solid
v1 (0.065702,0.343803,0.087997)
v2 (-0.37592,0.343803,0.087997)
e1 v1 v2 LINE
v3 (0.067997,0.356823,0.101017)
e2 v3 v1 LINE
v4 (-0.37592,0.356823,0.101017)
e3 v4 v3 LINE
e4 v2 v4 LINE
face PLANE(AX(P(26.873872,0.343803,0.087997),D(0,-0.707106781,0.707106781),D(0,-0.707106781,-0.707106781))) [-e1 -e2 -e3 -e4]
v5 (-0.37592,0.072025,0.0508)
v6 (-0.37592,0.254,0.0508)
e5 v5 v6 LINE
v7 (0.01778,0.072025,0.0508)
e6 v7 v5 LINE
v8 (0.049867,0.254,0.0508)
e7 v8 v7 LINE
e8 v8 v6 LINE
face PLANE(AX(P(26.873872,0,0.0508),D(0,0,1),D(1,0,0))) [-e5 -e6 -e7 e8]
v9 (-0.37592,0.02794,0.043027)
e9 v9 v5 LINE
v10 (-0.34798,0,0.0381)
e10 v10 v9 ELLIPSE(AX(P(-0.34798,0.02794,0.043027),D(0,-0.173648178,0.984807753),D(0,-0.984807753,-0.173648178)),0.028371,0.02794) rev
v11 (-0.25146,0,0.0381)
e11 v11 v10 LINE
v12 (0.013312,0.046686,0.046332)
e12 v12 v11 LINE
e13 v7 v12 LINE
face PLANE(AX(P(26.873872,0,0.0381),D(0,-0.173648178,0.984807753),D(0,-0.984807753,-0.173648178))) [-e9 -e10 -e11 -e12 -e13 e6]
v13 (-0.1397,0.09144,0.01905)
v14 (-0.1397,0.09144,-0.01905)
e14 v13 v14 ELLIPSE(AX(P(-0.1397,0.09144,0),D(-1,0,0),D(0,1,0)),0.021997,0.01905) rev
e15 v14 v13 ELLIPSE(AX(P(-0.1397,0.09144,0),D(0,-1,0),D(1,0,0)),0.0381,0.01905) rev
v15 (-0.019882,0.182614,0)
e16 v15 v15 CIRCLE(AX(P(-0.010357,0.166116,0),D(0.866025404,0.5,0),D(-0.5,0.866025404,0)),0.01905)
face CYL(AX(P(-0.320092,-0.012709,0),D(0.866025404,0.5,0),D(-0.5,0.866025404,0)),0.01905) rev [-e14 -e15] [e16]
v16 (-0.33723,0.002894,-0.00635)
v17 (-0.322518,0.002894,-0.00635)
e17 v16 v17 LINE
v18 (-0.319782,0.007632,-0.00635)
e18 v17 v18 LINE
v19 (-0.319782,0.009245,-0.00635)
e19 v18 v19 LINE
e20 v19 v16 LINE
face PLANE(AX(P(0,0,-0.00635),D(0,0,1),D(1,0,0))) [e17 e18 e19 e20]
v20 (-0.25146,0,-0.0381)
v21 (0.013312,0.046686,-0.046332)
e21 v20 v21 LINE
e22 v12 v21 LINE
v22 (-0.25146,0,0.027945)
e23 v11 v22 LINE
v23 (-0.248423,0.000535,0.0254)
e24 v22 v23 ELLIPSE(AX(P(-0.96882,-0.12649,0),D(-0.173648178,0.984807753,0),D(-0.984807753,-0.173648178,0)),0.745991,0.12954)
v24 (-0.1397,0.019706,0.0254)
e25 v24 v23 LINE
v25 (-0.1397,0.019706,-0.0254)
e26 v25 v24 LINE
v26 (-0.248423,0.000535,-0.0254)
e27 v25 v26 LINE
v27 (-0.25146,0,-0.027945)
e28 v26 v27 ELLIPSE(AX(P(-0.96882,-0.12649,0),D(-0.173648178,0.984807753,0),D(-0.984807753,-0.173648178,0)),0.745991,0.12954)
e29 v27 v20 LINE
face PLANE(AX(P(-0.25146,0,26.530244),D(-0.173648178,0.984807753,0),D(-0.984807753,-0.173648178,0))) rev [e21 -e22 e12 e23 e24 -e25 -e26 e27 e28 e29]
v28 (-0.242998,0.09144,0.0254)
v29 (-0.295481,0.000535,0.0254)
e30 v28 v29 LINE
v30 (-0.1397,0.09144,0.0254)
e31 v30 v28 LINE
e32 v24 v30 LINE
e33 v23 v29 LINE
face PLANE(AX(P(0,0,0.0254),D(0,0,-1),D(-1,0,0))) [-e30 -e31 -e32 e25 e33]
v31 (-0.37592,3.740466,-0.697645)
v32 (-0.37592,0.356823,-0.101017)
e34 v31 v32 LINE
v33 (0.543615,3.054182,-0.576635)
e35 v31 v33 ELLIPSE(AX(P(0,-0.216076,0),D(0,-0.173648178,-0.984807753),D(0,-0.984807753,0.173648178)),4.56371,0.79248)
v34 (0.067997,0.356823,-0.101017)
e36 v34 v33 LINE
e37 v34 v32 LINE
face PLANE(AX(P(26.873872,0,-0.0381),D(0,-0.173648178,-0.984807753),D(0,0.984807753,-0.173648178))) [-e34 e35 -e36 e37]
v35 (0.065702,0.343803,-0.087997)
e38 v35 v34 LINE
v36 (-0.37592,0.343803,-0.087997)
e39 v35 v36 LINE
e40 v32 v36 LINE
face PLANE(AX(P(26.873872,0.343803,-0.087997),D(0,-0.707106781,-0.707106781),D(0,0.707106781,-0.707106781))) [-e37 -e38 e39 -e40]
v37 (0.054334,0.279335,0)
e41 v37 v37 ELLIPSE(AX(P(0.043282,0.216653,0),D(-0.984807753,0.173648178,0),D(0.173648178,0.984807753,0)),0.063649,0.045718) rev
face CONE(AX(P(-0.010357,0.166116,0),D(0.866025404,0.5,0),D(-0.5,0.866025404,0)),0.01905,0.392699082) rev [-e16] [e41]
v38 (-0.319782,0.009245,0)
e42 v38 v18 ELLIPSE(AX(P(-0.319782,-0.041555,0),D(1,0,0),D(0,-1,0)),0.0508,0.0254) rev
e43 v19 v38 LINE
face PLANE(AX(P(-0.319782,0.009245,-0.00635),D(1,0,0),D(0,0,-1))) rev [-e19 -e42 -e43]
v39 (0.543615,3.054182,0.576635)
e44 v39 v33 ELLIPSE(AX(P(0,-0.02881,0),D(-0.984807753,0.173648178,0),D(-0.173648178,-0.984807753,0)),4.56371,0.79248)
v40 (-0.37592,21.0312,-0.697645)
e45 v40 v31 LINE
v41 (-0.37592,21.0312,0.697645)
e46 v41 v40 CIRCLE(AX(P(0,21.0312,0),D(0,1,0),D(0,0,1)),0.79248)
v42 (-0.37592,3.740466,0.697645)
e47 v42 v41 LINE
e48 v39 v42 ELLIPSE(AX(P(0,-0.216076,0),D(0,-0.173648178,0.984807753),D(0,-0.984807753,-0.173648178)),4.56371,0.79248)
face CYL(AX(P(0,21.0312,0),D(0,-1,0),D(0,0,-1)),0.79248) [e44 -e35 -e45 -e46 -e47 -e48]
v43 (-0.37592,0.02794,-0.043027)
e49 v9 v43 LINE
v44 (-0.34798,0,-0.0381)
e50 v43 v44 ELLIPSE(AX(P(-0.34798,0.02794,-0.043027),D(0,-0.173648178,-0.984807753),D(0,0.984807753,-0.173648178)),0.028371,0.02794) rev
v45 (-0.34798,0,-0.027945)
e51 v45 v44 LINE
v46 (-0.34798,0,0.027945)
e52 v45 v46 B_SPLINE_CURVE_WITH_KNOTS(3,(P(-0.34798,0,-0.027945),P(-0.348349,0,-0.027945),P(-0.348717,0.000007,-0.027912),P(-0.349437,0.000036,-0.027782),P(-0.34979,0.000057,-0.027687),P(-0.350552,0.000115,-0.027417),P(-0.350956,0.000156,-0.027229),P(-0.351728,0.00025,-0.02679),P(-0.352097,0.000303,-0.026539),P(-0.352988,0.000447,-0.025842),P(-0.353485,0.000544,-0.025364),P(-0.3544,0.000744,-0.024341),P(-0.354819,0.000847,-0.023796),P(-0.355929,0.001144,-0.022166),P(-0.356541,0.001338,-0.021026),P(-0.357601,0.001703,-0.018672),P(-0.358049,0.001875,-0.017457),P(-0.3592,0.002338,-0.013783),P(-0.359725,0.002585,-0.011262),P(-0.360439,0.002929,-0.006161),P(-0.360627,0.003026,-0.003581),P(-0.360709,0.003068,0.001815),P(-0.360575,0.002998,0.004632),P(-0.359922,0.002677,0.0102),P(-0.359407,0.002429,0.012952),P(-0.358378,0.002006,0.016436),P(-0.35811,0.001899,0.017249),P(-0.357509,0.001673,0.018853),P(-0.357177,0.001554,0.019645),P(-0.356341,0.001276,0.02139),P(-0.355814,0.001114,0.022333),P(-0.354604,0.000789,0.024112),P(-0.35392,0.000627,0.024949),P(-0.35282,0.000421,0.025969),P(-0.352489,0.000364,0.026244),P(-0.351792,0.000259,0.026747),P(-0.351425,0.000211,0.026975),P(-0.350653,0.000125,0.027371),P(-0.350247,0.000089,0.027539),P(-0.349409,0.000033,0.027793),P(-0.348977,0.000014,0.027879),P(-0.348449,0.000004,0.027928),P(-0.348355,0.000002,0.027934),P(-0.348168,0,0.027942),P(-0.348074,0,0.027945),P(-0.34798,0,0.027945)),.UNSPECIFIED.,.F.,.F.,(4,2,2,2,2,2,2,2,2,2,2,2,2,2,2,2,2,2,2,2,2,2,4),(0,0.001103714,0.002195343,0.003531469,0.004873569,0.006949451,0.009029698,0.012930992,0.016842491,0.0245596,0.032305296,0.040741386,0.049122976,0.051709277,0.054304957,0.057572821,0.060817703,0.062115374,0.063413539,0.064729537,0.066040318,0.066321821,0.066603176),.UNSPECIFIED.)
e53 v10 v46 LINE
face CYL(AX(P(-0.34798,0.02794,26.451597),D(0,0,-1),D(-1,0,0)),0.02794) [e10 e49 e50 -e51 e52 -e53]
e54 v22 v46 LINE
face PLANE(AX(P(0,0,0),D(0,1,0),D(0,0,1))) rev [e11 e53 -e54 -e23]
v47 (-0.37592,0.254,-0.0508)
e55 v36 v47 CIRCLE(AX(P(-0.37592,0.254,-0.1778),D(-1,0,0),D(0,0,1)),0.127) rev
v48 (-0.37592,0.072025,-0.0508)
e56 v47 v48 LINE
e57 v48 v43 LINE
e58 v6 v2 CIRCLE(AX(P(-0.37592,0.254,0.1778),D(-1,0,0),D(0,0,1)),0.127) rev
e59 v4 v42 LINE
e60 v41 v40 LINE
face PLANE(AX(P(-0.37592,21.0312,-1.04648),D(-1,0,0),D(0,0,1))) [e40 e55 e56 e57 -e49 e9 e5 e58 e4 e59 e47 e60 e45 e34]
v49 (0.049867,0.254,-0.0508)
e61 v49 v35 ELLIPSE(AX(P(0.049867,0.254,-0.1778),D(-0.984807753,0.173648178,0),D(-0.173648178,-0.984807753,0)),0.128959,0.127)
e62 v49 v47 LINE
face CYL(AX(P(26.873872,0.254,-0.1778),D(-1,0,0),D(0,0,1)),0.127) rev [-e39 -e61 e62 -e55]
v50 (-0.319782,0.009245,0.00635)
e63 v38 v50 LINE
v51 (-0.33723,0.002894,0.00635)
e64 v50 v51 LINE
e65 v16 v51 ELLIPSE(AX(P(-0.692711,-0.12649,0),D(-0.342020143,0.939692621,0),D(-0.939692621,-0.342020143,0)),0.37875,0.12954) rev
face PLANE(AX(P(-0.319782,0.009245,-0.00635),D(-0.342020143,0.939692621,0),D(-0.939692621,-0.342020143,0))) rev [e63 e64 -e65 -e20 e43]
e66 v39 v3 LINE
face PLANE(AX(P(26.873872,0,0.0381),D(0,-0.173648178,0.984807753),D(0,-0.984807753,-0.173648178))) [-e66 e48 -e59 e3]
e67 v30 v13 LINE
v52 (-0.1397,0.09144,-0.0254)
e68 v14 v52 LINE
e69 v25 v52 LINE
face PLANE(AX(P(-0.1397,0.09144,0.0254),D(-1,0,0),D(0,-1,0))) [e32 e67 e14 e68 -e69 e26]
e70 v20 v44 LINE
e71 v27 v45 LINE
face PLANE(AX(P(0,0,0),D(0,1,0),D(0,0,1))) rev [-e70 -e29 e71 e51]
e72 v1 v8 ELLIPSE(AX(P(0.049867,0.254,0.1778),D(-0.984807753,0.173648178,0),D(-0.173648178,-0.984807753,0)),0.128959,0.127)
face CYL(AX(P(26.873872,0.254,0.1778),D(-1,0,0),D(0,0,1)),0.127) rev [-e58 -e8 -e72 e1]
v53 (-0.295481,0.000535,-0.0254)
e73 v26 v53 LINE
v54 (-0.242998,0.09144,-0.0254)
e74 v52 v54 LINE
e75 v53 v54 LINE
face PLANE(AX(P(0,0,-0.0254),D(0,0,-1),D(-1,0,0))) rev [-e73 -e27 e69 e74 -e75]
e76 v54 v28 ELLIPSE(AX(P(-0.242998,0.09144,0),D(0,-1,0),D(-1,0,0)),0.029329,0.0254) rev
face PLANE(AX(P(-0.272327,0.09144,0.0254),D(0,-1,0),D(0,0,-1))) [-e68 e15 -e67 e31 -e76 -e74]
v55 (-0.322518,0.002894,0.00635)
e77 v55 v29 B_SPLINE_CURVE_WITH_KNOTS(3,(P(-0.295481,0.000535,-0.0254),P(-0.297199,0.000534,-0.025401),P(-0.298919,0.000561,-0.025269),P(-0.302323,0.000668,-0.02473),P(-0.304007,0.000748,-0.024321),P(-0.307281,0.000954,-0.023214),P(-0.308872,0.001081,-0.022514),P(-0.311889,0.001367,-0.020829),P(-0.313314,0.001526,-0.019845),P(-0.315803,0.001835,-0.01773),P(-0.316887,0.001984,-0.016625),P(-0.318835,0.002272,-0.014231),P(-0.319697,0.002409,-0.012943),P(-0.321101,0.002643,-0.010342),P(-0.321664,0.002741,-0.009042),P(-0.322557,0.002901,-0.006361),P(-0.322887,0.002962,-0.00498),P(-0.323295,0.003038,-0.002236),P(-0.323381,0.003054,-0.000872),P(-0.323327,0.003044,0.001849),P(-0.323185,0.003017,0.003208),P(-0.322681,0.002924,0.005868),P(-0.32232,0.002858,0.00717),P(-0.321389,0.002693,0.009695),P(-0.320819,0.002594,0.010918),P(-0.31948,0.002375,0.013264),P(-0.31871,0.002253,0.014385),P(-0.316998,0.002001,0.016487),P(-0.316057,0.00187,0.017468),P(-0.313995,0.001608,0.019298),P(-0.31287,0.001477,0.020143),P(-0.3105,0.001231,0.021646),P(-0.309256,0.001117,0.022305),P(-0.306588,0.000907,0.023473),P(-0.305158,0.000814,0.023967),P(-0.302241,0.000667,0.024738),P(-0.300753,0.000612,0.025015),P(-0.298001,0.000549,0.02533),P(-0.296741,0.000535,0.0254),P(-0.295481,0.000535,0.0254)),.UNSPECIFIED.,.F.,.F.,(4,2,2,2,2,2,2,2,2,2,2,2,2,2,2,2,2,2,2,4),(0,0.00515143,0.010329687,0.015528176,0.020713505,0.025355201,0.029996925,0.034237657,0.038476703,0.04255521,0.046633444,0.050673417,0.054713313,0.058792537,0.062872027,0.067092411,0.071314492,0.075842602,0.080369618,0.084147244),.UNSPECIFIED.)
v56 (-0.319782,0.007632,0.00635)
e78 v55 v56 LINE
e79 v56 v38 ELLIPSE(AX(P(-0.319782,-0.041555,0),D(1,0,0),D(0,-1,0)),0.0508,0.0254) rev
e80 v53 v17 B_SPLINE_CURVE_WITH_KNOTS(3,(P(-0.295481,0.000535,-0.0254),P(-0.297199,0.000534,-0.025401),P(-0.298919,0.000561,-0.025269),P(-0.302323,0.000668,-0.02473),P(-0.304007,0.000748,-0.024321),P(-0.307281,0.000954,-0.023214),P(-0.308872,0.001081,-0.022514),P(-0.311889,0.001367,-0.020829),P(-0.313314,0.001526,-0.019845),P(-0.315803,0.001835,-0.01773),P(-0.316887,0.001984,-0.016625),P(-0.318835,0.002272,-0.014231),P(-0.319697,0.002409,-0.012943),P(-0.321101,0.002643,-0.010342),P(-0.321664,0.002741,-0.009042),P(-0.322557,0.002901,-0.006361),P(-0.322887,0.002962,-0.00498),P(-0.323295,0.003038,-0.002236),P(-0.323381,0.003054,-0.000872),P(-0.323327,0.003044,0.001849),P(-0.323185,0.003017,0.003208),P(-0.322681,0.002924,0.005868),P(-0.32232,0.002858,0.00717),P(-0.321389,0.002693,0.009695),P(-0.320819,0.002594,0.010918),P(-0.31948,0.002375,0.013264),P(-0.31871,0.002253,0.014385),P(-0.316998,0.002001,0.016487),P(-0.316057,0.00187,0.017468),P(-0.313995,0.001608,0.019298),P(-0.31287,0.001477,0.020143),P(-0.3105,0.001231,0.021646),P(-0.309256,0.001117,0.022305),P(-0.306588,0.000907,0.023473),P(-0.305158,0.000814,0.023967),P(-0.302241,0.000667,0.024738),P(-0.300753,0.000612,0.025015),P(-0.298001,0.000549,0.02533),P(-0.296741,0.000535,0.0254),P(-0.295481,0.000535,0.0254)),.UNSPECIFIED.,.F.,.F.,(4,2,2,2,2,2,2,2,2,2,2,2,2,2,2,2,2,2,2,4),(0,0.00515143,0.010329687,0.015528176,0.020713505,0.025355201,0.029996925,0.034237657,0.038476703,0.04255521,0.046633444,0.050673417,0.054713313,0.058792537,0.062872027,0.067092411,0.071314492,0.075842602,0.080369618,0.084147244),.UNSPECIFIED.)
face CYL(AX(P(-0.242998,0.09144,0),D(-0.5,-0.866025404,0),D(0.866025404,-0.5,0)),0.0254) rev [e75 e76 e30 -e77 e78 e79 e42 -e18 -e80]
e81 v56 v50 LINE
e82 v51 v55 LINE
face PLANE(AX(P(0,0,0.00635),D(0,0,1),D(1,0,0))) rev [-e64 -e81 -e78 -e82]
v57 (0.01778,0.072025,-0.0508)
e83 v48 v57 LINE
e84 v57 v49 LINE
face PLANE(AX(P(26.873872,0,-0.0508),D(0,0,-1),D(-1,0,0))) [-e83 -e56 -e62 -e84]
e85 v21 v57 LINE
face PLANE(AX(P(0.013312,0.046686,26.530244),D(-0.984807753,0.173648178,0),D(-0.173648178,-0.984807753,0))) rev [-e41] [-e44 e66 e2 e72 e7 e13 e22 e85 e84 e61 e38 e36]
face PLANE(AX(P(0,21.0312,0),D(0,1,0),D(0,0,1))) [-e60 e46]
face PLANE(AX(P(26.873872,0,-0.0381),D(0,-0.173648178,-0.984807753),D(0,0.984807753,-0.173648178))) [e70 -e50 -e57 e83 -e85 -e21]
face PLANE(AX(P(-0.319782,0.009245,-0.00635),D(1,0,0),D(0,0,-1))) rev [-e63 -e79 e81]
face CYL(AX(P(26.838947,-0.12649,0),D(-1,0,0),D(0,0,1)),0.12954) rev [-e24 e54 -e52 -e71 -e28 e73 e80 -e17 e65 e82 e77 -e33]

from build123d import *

# Parameters (mm, degrees)
TD_SKETCH_R                             = 0.79248
TL_FEATURE_DEPTH                        = 21.0312
TDF_STD_SKETCH_W                        = 2.09296
TDF_STD_SKETCH_H                        = 2.09296
TDF_STD_FEATURE_DEPTH                   = 22.061040395
ISA_20_STD_FEATURE_DEPTH                = 22.061040395
ISA_20_STD_FEATURE_DEPTH_BACK           = 22.061040395
VW_STD_FEATURE_DEPTH                    = 22.061040395
VW_STD_FEATURE_DEPTH_BACK               = 22.061040395
F_10BA_STD_FEATURE_DEPTH                = 22.061040503
F_10BA_STD_FEATURE_DEPTH_BACK           = 22.061040503
FRO_STD_FEATURE_DEPTH                   = 22.061040395
FRO_STD_FEATURE_DEPTH_BACK              = 22.061040395
C_STD_FEATURE_DEPTH                     = 22.061040395
C_STD_FEATURE_DEPTH_BACK                = 22.061040395
ERW_STD_FEATURE_DEPTH                   = 0.0254
H_STD_FEATURE_REACH                     = 22.896
H_STD_SKETCH_R                          = 0.01905
H_STD_SKETCH_3_R                        = 0.01905
FUNNEL_FINAL_DIAMETRE_STD_FEATURE_DEPTH = 2.499995
FUNNEL_FINAL_DIAMETRE_STD_FEATURE_DRAFT = -22.5
ROUND_BR_STD_FEATURE_START              = -1
ROUND_BR_STD_FEATURE_DEPTH              = 1.009339363
CBRA_STD_FEATURE_DEPTH                  = 0.00635


with BuildPart() as part:
    # TD_sketch → TL_feature (new body)
    with BuildSketch(Plane(origin=(0, 0, 0), x_dir=(1, 0, 0), z_dir=(0, 1, 0))):
        with Locations(Location((0, 0, 0), (0, 0, 270))):
            Circle(TD_SKETCH_R)
    extrude(amount=TL_FEATURE_DEPTH)

    # TDF_STD_sketch → TDF_STD_feature (cut, through all)
    with BuildSketch(Plane(origin=(0, 0, 0), x_dir=(1, 0, 0), z_dir=(0, 1, 0))):
        with Locations((-1.4224, 0)):
            Rectangle(TDF_STD_SKETCH_W, TDF_STD_SKETCH_H)
    extrude(amount=TDF_STD_FEATURE_DEPTH, mode=Mode.SUBTRACT)

    # ISA_20_STD_sketch → ISA_20_STD_feature (cut, two sides: drawn at the far end of the back side and taken through both)
    with BuildSketch(Plane(origin=(0, 0, 0), x_dir=(0, 0, -1), z_dir=(1, 0, 0)).offset(-ISA_20_STD_FEATURE_DEPTH_BACK)):
        Polygon((-12.955177728, 73.256388083), (-3.746467997, 21.0312), (-0.0381, 0), (0.0381, 0), (3.746467997, 21.0312), (12.955177728, 73.256388083), (12.955177728, -32.805303497), (-12.955177728, -32.805303497), align=None)
    extrude(amount=ISA_20_STD_FEATURE_DEPTH + ISA_20_STD_FEATURE_DEPTH_BACK, mode=Mode.SUBTRACT)

    # VW_STD_sketch → VW_STD_feature (cut, two sides: drawn at the far end of the back side and taken through both)
    with BuildSketch(Plane(origin=(0, 0, 0), x_dir=(0, 0, -1), z_dir=(1, 0, 0)).offset(-VW_STD_FEATURE_DEPTH_BACK)):
        with BuildLine():
            Line((-70.448918022, 70.704723144), (-20.775394878, 21.0312))
            Line((-20.775394878, 21.0312), (-0.087997439, 0.343802561))
            ThreePointArc((-0.087997439, 0.343802561), (-0.060467299, 0.302600796), (-0.0508, 0.254))
            Line((-0.0508, 0.254), (-0.0508, 0))
            Line((-0.0508, 0), (0.0508, 0))
            Line((0.0508, 0), (0.0508, 0.254))
            ThreePointArc((0.0508, 0.254), (0.060467299, 0.302600796), (0.087997439, 0.343802561))
            Line((0.087997439, 0.343802561), (20.775394878, 21.0312))
            Line((20.775394878, 21.0312), (70.448918022, 70.704723144))
            Line((70.448918022, 70.704723144), (70.448918022, -69.793217099))
            Line((70.448918022, -69.793217099), (-70.448918022, -69.793217099))
            Line((-70.448918022, -69.793217099), (-70.448918022, 70.704723144))
        make_face()
    extrude(amount=VW_STD_FEATURE_DEPTH + VW_STD_FEATURE_DEPTH_BACK, mode=Mode.SUBTRACT)

    # 10BA_STD_sketch → 10BA_STD_feature (cut, two sides: drawn at the far end of the back side and taken through both)
    with BuildSketch(Plane.XY.offset(-F_10BA_STD_FEATURE_DEPTH_BACK)):
        Polygon((-53.226091952, 0), (-0.37592, 0), (-0.25146, 0), (0.013312083, 0.046686462), (3.713447997, 21.0312), (12.890784046, 73.078459086), (91.272293968, 2.163710242), (25.155417971, -70.914748844), align=None)
    extrude(amount=F_10BA_STD_FEATURE_DEPTH + F_10BA_STD_FEATURE_DEPTH_BACK, mode=Mode.SUBTRACT)

    # FRO_STD_sketch → FRO_STD_feature (cut, two sides: drawn at the far end of the back side and taken through both)
    with BuildSketch(Plane.XY.offset(-FRO_STD_FEATURE_DEPTH_BACK)):
        with BuildLine():
            Line((-0.37592, 52.152138388), (-0.37592, 0.02794))
            ThreePointArc((-0.37592, 0.02794), (-0.367736563, 0.008183437), (-0.34798, 0))
            Line((-0.34798, 0), (51.776218388, 0))
            Line((51.776218388, 0), (-21.9385299, -73.714748288))
            Line((-21.9385299, -73.714748288), (-74.090668288, -21.5626099))
            Line((-74.090668288, -21.5626099), (-0.37592, 52.152138388))
        make_face()
    extrude(amount=FRO_STD_FEATURE_DEPTH + FRO_STD_FEATURE_DEPTH_BACK, mode=Mode.SUBTRACT)

    # C_STD_sketch → C_STD_feature (cut, two sides: drawn at the far end of the back side and taken through both)
    with BuildSketch(Plane(origin=(0, 0, 0), x_dir=(0, 0, -1), z_dir=(1, 0, 0)).offset(-C_STD_FEATURE_DEPTH_BACK)):
        with BuildLine():
            Line((-50.8957695, -11.2378876), (-0.027944581, 0))
            ThreePointArc((-0.027944581, 0), (0, 0.003050032), (0.027944581, 0))
            Line((0.027944581, 0), (50.8957695, -11.2378876))
            Line((50.8957695, -11.2378876), (50.8957695, -115.426672595))
            Line((50.8957695, -115.426672595), (-50.8957695, -115.426672595))
            Line((-50.8957695, -115.426672595), (-50.8957695, -11.2378876))
        make_face()
    extrude(amount=C_STD_FEATURE_DEPTH + C_STD_FEATURE_DEPTH_BACK, mode=Mode.SUBTRACT)


with BuildPart() as body_2:
    # ERW_STD_sketch → ERW_STD_feature (new, symmetric)
    with BuildSketch(Plane.XY):
        Polygon((-0.1397, 0.09144), (-0.1397, 0), (-0.32512, 0), (-0.272327091, 0.09144), align=None)
    extrude(amount=ERW_STD_FEATURE_DEPTH, both=True)

    # H_STD_sketch → H_STD_feature (add, up to next)
    with BuildSketch(Plane(origin=(-0.010357492, 0.166115932, 0), x_dir=(0, 0, -1), z_dir=(0.8660254037844415, 0.4999999999999953, 0)), mode=Mode.PRIVATE) as h_std_feature_sk1:
        with Locations(Location((0, 0, 0), (0, 0, 90))):
            Circle(H_STD_SKETCH_R)
    h_std_feature_tool1 = extrude(h_std_feature_sk1.sketch, amount=-H_STD_FEATURE_REACH, mode=Mode.PRIVATE) - body_2.part
    add(h_std_feature_tool1.solids().sort_by_distance((-0.010357, 0.166116, 0))[0])


with BuildPart() as funnel_final_diametre_std_feature_tool:
    # H_STD_sketch<3> → funnel_final_diametre_STD_feature (with draft: the straight prism first)
    with BuildSketch(Plane(origin=(-0.010357492, 0.166115932, 0), x_dir=(0, 0, -1), z_dir=(0.8660254037844415, 0.4999999999999953, 0))):
        with Locations(Location((0, 0, 0), (0, 0, 90))):
            Circle(H_STD_SKETCH_3_R)
    extrude(amount=FUNNEL_FINAL_DIAMETRE_STD_FEATURE_DEPTH)
    # funnel_final_diametre_STD_feature: the draft: its side faces are tilted about the plane it starts from
    funnel_final_diametre_std_feature_sides = [funnel_final_diametre_std_feature_tool.faces().sort_by_distance(p)[0] for p in [
        (1.081697098, 0.774616898, 0),
    ]]
    draft(funnel_final_diametre_std_feature_sides, Plane(origin=(-0.010357492, 0.166115932, 0), x_dir=(0, 0, -1), z_dir=(0.8660254037844415, 0.4999999999999953, 0)), FUNNEL_FINAL_DIAMETRE_STD_FEATURE_DRAFT)


with BuildPart() as body_2_1:
    add(body_2.part)

    # funnel_final_diametre_STD_feature: add funnel_final_diametre_std_feature_tool
    add(funnel_final_diametre_std_feature_tool.part)

    # ROUND_BR_STD_feature: read off the stored shape, not the designer's step
    # ROUND_BR_STD_feature outline → ROUND_BR_STD_feature (cut)
    with BuildSketch(Plane(origin=(0, 0, 0), x_dir=(0.8660254037844362, -0.5000000000000042, 0), z_dir=(0.5000000000000042, 0.8660254037844363, 0)).offset(ROUND_BR_STD_FEATURE_START)):
        with BuildLine():
            Line((-0.281562179, -0.0254), (-0.256162179, -0.0254))
            ThreePointArc((-0.256162179, -0.0254), (-0.274122691, -0.017960512), (-0.281562179, 0))
            Line((-0.281562179, 0), (-0.281562179, -0.0254))
        make_face()
        with BuildLine():
            Line((-0.281562179, 0.0254), (-0.281562179, 0))
            ThreePointArc((-0.281562179, 0), (-0.274122691, 0.017960512), (-0.256162179, 0.0254))
            Line((-0.256162179, 0.0254), (-0.281562179, 0.0254))
        make_face()
    extrude(amount=ROUND_BR_STD_FEATURE_DEPTH, mode=Mode.SUBTRACT)


with BuildPart() as part_1:
    add(part.part)

    # COMBINE_STD_feature: cut body 2
    add(body_2_1.part, mode=Mode.SUBTRACT)

    # CBRA_STD_sketch → CBRA_STD_feature (cut, symmetric)
    with BuildSketch(Plane.XY):
        Polygon((-0.319782487, 0.009244844), (-0.345182487, 0), (-0.319782487, 0), align=None)
    extrude(amount=CBRA_STD_FEATURE_DEPTH, both=True, mode=Mode.SUBTRACT)


solid = part_1.part
